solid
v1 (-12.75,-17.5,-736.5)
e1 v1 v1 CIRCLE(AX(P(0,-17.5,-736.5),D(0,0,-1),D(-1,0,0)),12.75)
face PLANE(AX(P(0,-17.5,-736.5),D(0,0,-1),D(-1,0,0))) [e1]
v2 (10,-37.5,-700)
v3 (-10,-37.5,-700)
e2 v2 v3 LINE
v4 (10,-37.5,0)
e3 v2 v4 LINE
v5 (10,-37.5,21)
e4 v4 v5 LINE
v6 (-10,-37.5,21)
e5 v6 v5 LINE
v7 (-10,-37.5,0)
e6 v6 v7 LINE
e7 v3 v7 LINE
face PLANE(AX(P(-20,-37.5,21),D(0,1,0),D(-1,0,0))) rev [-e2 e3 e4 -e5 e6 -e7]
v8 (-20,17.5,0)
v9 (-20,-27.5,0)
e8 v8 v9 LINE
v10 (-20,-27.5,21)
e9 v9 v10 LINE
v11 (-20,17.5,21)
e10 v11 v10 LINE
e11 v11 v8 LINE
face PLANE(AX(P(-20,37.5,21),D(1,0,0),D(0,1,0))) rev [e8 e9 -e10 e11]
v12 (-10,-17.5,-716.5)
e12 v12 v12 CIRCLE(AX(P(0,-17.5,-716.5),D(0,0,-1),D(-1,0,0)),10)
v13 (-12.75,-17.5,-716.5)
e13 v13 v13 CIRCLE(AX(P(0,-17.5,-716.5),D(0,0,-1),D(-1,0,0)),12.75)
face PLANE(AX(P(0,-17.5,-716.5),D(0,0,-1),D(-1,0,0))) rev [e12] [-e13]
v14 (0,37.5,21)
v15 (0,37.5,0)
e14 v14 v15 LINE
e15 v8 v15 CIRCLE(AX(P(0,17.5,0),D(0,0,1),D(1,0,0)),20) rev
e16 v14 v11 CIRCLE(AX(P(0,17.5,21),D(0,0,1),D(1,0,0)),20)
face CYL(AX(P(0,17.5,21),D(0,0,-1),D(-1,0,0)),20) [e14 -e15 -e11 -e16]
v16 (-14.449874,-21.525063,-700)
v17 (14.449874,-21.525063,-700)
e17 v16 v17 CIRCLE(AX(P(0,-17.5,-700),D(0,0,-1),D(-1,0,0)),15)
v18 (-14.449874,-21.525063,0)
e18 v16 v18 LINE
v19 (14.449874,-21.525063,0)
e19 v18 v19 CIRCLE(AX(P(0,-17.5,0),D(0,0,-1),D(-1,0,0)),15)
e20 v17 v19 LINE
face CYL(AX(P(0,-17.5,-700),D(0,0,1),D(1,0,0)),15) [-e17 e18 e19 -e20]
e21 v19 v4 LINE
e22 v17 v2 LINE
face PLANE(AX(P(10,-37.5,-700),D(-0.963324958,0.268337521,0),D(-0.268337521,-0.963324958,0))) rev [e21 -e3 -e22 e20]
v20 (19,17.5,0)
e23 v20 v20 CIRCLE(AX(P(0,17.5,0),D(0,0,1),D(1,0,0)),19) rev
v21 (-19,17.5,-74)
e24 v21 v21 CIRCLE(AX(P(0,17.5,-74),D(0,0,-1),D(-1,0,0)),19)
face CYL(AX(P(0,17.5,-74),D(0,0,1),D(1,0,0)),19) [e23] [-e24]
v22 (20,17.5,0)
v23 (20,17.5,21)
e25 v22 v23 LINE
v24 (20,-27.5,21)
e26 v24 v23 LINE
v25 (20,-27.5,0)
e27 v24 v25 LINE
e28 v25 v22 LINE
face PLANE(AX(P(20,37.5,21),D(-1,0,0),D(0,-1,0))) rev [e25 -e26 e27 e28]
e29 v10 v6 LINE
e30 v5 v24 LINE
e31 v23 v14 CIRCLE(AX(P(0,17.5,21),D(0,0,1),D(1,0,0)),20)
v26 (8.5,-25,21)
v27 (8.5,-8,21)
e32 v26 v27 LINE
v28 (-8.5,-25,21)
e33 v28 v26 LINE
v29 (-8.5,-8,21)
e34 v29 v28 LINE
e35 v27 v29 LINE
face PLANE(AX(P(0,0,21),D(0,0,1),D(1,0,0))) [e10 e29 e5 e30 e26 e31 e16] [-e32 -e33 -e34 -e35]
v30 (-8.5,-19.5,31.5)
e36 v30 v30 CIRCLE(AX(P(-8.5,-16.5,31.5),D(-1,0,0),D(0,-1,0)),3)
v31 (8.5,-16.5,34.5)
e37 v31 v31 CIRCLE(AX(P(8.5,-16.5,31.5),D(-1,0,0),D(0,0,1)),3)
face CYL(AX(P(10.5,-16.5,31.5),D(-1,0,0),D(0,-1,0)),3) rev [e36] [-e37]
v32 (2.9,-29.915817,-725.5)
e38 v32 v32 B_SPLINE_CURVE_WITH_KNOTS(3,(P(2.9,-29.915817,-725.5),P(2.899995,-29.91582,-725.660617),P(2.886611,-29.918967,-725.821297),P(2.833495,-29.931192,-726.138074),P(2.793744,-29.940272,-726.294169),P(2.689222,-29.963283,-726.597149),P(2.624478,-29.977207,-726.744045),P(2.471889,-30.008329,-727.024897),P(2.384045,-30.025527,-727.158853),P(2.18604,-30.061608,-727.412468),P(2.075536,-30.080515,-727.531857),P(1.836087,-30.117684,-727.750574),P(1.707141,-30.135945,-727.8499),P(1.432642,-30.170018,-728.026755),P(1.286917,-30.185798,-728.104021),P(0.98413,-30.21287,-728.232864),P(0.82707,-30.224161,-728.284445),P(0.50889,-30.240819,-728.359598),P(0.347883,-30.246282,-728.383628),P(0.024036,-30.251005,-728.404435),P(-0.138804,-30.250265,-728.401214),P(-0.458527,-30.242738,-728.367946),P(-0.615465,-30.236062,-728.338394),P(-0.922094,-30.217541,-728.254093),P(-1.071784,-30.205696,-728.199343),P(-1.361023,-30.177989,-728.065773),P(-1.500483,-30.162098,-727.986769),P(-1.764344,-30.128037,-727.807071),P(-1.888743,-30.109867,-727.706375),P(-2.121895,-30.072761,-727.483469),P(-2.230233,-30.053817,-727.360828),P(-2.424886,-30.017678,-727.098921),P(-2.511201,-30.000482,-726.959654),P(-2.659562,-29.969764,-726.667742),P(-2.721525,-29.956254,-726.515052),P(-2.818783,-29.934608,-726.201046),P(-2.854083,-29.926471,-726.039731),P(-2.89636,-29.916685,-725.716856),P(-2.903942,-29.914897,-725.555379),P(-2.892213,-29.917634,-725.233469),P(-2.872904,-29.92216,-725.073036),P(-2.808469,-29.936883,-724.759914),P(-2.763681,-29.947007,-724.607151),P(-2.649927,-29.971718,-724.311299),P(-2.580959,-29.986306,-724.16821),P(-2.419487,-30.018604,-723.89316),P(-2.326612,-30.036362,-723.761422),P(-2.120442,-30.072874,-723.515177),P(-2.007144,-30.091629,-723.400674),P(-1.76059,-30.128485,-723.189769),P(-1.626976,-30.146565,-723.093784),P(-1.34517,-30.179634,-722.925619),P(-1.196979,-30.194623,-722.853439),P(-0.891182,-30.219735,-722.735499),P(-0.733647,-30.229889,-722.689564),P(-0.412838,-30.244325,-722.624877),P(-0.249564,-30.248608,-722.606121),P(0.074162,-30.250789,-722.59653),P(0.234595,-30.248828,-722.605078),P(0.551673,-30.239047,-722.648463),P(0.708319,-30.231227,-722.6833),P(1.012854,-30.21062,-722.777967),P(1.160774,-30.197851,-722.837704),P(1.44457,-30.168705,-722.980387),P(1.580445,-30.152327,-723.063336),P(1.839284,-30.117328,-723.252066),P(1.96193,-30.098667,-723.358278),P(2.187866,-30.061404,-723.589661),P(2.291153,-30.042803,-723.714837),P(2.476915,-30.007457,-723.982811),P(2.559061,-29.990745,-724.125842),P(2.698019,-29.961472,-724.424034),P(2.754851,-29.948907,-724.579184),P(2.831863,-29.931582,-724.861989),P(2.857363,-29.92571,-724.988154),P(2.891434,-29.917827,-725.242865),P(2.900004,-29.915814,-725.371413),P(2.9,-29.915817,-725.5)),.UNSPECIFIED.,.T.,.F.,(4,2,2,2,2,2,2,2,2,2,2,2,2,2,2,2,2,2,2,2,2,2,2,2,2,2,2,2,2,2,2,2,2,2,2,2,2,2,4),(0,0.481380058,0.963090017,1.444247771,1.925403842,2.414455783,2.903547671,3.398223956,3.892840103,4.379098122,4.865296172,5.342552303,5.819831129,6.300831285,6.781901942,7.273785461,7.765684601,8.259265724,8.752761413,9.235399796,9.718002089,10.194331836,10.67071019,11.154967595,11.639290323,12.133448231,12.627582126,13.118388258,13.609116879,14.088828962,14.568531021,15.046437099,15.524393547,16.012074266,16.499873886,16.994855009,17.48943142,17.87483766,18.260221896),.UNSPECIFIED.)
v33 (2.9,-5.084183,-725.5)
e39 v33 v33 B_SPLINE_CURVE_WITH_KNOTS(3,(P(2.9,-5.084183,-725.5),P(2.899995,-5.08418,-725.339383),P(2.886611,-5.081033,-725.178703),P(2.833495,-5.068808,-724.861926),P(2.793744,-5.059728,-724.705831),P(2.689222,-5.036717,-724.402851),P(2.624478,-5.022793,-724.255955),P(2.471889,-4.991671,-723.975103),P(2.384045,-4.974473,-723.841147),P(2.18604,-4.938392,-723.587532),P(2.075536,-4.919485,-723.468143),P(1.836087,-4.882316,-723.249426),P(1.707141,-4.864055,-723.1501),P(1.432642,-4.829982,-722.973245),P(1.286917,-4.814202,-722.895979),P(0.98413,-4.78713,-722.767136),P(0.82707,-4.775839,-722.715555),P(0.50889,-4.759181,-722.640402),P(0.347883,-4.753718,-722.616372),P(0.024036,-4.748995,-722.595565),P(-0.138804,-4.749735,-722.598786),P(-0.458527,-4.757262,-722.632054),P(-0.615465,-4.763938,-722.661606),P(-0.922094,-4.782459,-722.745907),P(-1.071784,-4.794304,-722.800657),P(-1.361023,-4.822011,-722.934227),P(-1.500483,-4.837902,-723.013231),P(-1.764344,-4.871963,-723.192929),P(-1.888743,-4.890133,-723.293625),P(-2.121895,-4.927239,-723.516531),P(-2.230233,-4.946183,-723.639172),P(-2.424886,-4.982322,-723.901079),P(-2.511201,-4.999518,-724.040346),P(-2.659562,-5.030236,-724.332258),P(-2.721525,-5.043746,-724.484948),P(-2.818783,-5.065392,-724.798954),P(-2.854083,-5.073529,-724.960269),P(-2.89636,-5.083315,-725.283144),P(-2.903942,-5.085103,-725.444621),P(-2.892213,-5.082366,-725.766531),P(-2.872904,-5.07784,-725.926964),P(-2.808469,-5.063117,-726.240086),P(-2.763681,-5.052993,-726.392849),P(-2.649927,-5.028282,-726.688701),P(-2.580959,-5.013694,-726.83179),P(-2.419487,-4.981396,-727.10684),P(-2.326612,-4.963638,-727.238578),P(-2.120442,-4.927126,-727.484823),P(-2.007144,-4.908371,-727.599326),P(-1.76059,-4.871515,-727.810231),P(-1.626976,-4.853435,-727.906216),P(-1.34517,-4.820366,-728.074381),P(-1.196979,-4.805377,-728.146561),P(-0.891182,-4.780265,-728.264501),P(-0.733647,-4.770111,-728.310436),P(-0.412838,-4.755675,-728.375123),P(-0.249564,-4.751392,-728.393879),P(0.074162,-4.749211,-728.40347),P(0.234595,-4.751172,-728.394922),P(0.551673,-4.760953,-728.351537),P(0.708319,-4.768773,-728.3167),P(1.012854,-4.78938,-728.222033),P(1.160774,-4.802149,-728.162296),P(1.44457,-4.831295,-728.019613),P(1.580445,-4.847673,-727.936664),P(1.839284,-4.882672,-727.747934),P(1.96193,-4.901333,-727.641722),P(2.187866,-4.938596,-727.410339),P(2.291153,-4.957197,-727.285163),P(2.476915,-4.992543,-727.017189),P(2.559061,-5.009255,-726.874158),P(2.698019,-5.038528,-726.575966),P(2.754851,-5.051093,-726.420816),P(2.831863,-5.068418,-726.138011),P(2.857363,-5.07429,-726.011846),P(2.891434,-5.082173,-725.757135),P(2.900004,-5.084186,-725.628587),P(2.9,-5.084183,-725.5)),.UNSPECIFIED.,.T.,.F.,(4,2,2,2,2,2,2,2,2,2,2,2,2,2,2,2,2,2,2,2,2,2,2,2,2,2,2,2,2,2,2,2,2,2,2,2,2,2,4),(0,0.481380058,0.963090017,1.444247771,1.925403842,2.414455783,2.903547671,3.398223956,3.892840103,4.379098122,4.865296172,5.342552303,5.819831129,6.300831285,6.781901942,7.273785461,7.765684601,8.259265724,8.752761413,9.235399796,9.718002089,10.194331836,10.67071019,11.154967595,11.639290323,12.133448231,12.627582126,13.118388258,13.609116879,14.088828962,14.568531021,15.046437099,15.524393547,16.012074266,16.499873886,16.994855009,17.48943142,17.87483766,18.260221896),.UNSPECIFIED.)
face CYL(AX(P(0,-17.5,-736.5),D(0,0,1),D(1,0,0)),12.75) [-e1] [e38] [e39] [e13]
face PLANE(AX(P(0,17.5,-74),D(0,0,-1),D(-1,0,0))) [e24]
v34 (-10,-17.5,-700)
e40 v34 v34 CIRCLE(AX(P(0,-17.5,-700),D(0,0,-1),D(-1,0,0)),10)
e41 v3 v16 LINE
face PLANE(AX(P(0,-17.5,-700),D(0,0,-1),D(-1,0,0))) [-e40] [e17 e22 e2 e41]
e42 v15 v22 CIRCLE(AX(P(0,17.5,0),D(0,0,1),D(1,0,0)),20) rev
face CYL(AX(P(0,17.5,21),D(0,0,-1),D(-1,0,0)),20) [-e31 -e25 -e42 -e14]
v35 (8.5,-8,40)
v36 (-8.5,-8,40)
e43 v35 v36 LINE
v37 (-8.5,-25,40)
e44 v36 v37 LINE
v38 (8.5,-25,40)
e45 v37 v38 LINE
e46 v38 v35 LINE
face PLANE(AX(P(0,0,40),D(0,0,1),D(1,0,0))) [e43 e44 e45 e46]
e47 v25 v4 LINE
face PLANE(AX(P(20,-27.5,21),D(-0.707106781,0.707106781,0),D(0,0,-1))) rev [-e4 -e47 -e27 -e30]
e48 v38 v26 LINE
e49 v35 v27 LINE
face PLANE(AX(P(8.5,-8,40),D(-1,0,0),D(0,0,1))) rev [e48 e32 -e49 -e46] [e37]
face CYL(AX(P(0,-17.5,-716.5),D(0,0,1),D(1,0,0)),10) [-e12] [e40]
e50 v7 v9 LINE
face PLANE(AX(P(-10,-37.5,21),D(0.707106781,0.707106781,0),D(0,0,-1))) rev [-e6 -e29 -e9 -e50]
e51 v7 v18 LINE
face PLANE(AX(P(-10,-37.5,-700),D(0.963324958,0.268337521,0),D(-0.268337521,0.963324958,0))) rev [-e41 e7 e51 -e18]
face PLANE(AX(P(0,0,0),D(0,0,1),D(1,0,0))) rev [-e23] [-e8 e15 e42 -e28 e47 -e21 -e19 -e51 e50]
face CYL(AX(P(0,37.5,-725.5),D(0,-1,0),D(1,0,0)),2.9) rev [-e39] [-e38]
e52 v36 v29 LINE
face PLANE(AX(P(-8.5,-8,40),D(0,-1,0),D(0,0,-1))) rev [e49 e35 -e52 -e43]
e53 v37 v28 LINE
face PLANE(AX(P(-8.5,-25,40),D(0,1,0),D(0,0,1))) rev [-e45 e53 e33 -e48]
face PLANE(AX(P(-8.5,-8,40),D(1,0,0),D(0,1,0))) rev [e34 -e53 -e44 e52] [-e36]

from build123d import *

# Parameters (mm, degrees)
SKETCH_1_W          = 40
SKETCH_1_H          = 75
EXTRUDE_1_DEPTH     = 21
FILLET_1_R          = 20
CHAMFER_1_SIZE      = 10
EXTRUDE_2_DEPTH     = 700
SKETCH_3_R          = 19
EXTRUDE_4_DEPTH     = 74
SKETCH_4_W          = 17
SKETCH_4_H          = 17
EXTRUDE_5_DEPTH     = 19
SKETCH_5_R          = 3
CUT_EXTRUDE_1_DEPTH = 19
SKETCH_6_R          = 10
EXTRUDE_6_DEPTH     = 16.5
SKETCH_7_R          = 12.75
EXTRUDE_7_DEPTH     = 20
SKETCH_9_R          = 2.9
CUT_EXTRUDE_2_DEPTH = 741.578996462


with BuildPart() as part:
    # 草图1 → 凸台-拉伸1 (new body)
    with BuildSketch(Plane.XY):
        Rectangle(SKETCH_1_W, SKETCH_1_H)
    extrude(amount=EXTRUDE_1_DEPTH)

    # 圆角1
    fillet_1_edges = [part.edges().sort_by_distance(p)[0] for p in [
        (-20, 37.5, 10.5),
        (20, 37.5, 10.5),
    ]]
    fillet(fillet_1_edges, radius=FILLET_1_R - 0.0001)  # a hair under: the kernel refuses the full size

    # 倒角1
    chamfer_1_edges = [part.edges().sort_by_distance(p)[0] for p in [
        (20, -37.5, 10.5),
        (-20, -37.5, 10.5),
    ]]
    chamfer(chamfer_1_edges, length=CHAMFER_1_SIZE)

    # 草图2 → 凸台-拉伸2 (add)
    with BuildSketch(Plane(origin=(0, 0, 0), x_dir=(-1, 0, 0), z_dir=(0, 0, -1))):
        with BuildLine():
            Line((-10, -37.5), (10, -37.5))
            Line((10, -37.5), (14.449874371, -21.525062814))
            ThreePointArc((14.449874371, -21.525062814), (0, -2.5), (-14.449874371, -21.525062814))
            Line((-14.449874371, -21.525062814), (-10, -37.5))
        make_face()
    extrude(amount=EXTRUDE_2_DEPTH)

    # 草图3 → 凸台-拉伸4 (add)
    with BuildSketch(Plane(origin=(0, 0, 0), x_dir=(-1, 0, 0), z_dir=(0, 0, -1))):
        with Locations(Location((0, 17.5, 0), (0, 0, 180))):
            Circle(SKETCH_3_R)
    extrude(amount=EXTRUDE_4_DEPTH)

    # 草图4 → 凸台-拉伸5 (add)
    with BuildSketch(Plane.XY.offset(21)):
        with Locations((0, -16.5)):
            Rectangle(SKETCH_4_W, SKETCH_4_H)
    extrude(amount=EXTRUDE_5_DEPTH)

    # 草图5 → 切除-拉伸1 (cut)
    with BuildSketch(Plane.ZY.offset(8.5)):
        with Locations(Location((31.5, -16.5, 0), (0, 0, 270))):
            Circle(SKETCH_5_R)
    extrude(amount=-CUT_EXTRUDE_1_DEPTH, mode=Mode.SUBTRACT)

    # 草图6 → 凸台-拉伸6 (add)
    with BuildSketch(Plane(origin=(0, 0, -700), x_dir=(-1, 0, 0), z_dir=(0, 0, -1))):
        with Locations((0, -17.5)):
            Circle(SKETCH_6_R)
    extrude(amount=EXTRUDE_6_DEPTH)

    # 草图7 → 凸台-拉伸7 (add)
    with BuildSketch(Plane(origin=(0, 0, -716.5), x_dir=(-1, 0, 0), z_dir=(0, 0, -1))):
        with Locations((0, -17.5)):
            Circle(SKETCH_7_R)
    extrude(amount=EXTRUDE_7_DEPTH)

    # 草图9 → 切除-拉伸2 (cut, through all)
    with BuildSketch(Plane.XZ.offset(37.5)):
        with Locations((0, -725.5)):
            Circle(SKETCH_9_R)
    extrude(amount=-CUT_EXTRUDE_2_DEPTH, mode=Mode.SUBTRACT)


solid = part.part
